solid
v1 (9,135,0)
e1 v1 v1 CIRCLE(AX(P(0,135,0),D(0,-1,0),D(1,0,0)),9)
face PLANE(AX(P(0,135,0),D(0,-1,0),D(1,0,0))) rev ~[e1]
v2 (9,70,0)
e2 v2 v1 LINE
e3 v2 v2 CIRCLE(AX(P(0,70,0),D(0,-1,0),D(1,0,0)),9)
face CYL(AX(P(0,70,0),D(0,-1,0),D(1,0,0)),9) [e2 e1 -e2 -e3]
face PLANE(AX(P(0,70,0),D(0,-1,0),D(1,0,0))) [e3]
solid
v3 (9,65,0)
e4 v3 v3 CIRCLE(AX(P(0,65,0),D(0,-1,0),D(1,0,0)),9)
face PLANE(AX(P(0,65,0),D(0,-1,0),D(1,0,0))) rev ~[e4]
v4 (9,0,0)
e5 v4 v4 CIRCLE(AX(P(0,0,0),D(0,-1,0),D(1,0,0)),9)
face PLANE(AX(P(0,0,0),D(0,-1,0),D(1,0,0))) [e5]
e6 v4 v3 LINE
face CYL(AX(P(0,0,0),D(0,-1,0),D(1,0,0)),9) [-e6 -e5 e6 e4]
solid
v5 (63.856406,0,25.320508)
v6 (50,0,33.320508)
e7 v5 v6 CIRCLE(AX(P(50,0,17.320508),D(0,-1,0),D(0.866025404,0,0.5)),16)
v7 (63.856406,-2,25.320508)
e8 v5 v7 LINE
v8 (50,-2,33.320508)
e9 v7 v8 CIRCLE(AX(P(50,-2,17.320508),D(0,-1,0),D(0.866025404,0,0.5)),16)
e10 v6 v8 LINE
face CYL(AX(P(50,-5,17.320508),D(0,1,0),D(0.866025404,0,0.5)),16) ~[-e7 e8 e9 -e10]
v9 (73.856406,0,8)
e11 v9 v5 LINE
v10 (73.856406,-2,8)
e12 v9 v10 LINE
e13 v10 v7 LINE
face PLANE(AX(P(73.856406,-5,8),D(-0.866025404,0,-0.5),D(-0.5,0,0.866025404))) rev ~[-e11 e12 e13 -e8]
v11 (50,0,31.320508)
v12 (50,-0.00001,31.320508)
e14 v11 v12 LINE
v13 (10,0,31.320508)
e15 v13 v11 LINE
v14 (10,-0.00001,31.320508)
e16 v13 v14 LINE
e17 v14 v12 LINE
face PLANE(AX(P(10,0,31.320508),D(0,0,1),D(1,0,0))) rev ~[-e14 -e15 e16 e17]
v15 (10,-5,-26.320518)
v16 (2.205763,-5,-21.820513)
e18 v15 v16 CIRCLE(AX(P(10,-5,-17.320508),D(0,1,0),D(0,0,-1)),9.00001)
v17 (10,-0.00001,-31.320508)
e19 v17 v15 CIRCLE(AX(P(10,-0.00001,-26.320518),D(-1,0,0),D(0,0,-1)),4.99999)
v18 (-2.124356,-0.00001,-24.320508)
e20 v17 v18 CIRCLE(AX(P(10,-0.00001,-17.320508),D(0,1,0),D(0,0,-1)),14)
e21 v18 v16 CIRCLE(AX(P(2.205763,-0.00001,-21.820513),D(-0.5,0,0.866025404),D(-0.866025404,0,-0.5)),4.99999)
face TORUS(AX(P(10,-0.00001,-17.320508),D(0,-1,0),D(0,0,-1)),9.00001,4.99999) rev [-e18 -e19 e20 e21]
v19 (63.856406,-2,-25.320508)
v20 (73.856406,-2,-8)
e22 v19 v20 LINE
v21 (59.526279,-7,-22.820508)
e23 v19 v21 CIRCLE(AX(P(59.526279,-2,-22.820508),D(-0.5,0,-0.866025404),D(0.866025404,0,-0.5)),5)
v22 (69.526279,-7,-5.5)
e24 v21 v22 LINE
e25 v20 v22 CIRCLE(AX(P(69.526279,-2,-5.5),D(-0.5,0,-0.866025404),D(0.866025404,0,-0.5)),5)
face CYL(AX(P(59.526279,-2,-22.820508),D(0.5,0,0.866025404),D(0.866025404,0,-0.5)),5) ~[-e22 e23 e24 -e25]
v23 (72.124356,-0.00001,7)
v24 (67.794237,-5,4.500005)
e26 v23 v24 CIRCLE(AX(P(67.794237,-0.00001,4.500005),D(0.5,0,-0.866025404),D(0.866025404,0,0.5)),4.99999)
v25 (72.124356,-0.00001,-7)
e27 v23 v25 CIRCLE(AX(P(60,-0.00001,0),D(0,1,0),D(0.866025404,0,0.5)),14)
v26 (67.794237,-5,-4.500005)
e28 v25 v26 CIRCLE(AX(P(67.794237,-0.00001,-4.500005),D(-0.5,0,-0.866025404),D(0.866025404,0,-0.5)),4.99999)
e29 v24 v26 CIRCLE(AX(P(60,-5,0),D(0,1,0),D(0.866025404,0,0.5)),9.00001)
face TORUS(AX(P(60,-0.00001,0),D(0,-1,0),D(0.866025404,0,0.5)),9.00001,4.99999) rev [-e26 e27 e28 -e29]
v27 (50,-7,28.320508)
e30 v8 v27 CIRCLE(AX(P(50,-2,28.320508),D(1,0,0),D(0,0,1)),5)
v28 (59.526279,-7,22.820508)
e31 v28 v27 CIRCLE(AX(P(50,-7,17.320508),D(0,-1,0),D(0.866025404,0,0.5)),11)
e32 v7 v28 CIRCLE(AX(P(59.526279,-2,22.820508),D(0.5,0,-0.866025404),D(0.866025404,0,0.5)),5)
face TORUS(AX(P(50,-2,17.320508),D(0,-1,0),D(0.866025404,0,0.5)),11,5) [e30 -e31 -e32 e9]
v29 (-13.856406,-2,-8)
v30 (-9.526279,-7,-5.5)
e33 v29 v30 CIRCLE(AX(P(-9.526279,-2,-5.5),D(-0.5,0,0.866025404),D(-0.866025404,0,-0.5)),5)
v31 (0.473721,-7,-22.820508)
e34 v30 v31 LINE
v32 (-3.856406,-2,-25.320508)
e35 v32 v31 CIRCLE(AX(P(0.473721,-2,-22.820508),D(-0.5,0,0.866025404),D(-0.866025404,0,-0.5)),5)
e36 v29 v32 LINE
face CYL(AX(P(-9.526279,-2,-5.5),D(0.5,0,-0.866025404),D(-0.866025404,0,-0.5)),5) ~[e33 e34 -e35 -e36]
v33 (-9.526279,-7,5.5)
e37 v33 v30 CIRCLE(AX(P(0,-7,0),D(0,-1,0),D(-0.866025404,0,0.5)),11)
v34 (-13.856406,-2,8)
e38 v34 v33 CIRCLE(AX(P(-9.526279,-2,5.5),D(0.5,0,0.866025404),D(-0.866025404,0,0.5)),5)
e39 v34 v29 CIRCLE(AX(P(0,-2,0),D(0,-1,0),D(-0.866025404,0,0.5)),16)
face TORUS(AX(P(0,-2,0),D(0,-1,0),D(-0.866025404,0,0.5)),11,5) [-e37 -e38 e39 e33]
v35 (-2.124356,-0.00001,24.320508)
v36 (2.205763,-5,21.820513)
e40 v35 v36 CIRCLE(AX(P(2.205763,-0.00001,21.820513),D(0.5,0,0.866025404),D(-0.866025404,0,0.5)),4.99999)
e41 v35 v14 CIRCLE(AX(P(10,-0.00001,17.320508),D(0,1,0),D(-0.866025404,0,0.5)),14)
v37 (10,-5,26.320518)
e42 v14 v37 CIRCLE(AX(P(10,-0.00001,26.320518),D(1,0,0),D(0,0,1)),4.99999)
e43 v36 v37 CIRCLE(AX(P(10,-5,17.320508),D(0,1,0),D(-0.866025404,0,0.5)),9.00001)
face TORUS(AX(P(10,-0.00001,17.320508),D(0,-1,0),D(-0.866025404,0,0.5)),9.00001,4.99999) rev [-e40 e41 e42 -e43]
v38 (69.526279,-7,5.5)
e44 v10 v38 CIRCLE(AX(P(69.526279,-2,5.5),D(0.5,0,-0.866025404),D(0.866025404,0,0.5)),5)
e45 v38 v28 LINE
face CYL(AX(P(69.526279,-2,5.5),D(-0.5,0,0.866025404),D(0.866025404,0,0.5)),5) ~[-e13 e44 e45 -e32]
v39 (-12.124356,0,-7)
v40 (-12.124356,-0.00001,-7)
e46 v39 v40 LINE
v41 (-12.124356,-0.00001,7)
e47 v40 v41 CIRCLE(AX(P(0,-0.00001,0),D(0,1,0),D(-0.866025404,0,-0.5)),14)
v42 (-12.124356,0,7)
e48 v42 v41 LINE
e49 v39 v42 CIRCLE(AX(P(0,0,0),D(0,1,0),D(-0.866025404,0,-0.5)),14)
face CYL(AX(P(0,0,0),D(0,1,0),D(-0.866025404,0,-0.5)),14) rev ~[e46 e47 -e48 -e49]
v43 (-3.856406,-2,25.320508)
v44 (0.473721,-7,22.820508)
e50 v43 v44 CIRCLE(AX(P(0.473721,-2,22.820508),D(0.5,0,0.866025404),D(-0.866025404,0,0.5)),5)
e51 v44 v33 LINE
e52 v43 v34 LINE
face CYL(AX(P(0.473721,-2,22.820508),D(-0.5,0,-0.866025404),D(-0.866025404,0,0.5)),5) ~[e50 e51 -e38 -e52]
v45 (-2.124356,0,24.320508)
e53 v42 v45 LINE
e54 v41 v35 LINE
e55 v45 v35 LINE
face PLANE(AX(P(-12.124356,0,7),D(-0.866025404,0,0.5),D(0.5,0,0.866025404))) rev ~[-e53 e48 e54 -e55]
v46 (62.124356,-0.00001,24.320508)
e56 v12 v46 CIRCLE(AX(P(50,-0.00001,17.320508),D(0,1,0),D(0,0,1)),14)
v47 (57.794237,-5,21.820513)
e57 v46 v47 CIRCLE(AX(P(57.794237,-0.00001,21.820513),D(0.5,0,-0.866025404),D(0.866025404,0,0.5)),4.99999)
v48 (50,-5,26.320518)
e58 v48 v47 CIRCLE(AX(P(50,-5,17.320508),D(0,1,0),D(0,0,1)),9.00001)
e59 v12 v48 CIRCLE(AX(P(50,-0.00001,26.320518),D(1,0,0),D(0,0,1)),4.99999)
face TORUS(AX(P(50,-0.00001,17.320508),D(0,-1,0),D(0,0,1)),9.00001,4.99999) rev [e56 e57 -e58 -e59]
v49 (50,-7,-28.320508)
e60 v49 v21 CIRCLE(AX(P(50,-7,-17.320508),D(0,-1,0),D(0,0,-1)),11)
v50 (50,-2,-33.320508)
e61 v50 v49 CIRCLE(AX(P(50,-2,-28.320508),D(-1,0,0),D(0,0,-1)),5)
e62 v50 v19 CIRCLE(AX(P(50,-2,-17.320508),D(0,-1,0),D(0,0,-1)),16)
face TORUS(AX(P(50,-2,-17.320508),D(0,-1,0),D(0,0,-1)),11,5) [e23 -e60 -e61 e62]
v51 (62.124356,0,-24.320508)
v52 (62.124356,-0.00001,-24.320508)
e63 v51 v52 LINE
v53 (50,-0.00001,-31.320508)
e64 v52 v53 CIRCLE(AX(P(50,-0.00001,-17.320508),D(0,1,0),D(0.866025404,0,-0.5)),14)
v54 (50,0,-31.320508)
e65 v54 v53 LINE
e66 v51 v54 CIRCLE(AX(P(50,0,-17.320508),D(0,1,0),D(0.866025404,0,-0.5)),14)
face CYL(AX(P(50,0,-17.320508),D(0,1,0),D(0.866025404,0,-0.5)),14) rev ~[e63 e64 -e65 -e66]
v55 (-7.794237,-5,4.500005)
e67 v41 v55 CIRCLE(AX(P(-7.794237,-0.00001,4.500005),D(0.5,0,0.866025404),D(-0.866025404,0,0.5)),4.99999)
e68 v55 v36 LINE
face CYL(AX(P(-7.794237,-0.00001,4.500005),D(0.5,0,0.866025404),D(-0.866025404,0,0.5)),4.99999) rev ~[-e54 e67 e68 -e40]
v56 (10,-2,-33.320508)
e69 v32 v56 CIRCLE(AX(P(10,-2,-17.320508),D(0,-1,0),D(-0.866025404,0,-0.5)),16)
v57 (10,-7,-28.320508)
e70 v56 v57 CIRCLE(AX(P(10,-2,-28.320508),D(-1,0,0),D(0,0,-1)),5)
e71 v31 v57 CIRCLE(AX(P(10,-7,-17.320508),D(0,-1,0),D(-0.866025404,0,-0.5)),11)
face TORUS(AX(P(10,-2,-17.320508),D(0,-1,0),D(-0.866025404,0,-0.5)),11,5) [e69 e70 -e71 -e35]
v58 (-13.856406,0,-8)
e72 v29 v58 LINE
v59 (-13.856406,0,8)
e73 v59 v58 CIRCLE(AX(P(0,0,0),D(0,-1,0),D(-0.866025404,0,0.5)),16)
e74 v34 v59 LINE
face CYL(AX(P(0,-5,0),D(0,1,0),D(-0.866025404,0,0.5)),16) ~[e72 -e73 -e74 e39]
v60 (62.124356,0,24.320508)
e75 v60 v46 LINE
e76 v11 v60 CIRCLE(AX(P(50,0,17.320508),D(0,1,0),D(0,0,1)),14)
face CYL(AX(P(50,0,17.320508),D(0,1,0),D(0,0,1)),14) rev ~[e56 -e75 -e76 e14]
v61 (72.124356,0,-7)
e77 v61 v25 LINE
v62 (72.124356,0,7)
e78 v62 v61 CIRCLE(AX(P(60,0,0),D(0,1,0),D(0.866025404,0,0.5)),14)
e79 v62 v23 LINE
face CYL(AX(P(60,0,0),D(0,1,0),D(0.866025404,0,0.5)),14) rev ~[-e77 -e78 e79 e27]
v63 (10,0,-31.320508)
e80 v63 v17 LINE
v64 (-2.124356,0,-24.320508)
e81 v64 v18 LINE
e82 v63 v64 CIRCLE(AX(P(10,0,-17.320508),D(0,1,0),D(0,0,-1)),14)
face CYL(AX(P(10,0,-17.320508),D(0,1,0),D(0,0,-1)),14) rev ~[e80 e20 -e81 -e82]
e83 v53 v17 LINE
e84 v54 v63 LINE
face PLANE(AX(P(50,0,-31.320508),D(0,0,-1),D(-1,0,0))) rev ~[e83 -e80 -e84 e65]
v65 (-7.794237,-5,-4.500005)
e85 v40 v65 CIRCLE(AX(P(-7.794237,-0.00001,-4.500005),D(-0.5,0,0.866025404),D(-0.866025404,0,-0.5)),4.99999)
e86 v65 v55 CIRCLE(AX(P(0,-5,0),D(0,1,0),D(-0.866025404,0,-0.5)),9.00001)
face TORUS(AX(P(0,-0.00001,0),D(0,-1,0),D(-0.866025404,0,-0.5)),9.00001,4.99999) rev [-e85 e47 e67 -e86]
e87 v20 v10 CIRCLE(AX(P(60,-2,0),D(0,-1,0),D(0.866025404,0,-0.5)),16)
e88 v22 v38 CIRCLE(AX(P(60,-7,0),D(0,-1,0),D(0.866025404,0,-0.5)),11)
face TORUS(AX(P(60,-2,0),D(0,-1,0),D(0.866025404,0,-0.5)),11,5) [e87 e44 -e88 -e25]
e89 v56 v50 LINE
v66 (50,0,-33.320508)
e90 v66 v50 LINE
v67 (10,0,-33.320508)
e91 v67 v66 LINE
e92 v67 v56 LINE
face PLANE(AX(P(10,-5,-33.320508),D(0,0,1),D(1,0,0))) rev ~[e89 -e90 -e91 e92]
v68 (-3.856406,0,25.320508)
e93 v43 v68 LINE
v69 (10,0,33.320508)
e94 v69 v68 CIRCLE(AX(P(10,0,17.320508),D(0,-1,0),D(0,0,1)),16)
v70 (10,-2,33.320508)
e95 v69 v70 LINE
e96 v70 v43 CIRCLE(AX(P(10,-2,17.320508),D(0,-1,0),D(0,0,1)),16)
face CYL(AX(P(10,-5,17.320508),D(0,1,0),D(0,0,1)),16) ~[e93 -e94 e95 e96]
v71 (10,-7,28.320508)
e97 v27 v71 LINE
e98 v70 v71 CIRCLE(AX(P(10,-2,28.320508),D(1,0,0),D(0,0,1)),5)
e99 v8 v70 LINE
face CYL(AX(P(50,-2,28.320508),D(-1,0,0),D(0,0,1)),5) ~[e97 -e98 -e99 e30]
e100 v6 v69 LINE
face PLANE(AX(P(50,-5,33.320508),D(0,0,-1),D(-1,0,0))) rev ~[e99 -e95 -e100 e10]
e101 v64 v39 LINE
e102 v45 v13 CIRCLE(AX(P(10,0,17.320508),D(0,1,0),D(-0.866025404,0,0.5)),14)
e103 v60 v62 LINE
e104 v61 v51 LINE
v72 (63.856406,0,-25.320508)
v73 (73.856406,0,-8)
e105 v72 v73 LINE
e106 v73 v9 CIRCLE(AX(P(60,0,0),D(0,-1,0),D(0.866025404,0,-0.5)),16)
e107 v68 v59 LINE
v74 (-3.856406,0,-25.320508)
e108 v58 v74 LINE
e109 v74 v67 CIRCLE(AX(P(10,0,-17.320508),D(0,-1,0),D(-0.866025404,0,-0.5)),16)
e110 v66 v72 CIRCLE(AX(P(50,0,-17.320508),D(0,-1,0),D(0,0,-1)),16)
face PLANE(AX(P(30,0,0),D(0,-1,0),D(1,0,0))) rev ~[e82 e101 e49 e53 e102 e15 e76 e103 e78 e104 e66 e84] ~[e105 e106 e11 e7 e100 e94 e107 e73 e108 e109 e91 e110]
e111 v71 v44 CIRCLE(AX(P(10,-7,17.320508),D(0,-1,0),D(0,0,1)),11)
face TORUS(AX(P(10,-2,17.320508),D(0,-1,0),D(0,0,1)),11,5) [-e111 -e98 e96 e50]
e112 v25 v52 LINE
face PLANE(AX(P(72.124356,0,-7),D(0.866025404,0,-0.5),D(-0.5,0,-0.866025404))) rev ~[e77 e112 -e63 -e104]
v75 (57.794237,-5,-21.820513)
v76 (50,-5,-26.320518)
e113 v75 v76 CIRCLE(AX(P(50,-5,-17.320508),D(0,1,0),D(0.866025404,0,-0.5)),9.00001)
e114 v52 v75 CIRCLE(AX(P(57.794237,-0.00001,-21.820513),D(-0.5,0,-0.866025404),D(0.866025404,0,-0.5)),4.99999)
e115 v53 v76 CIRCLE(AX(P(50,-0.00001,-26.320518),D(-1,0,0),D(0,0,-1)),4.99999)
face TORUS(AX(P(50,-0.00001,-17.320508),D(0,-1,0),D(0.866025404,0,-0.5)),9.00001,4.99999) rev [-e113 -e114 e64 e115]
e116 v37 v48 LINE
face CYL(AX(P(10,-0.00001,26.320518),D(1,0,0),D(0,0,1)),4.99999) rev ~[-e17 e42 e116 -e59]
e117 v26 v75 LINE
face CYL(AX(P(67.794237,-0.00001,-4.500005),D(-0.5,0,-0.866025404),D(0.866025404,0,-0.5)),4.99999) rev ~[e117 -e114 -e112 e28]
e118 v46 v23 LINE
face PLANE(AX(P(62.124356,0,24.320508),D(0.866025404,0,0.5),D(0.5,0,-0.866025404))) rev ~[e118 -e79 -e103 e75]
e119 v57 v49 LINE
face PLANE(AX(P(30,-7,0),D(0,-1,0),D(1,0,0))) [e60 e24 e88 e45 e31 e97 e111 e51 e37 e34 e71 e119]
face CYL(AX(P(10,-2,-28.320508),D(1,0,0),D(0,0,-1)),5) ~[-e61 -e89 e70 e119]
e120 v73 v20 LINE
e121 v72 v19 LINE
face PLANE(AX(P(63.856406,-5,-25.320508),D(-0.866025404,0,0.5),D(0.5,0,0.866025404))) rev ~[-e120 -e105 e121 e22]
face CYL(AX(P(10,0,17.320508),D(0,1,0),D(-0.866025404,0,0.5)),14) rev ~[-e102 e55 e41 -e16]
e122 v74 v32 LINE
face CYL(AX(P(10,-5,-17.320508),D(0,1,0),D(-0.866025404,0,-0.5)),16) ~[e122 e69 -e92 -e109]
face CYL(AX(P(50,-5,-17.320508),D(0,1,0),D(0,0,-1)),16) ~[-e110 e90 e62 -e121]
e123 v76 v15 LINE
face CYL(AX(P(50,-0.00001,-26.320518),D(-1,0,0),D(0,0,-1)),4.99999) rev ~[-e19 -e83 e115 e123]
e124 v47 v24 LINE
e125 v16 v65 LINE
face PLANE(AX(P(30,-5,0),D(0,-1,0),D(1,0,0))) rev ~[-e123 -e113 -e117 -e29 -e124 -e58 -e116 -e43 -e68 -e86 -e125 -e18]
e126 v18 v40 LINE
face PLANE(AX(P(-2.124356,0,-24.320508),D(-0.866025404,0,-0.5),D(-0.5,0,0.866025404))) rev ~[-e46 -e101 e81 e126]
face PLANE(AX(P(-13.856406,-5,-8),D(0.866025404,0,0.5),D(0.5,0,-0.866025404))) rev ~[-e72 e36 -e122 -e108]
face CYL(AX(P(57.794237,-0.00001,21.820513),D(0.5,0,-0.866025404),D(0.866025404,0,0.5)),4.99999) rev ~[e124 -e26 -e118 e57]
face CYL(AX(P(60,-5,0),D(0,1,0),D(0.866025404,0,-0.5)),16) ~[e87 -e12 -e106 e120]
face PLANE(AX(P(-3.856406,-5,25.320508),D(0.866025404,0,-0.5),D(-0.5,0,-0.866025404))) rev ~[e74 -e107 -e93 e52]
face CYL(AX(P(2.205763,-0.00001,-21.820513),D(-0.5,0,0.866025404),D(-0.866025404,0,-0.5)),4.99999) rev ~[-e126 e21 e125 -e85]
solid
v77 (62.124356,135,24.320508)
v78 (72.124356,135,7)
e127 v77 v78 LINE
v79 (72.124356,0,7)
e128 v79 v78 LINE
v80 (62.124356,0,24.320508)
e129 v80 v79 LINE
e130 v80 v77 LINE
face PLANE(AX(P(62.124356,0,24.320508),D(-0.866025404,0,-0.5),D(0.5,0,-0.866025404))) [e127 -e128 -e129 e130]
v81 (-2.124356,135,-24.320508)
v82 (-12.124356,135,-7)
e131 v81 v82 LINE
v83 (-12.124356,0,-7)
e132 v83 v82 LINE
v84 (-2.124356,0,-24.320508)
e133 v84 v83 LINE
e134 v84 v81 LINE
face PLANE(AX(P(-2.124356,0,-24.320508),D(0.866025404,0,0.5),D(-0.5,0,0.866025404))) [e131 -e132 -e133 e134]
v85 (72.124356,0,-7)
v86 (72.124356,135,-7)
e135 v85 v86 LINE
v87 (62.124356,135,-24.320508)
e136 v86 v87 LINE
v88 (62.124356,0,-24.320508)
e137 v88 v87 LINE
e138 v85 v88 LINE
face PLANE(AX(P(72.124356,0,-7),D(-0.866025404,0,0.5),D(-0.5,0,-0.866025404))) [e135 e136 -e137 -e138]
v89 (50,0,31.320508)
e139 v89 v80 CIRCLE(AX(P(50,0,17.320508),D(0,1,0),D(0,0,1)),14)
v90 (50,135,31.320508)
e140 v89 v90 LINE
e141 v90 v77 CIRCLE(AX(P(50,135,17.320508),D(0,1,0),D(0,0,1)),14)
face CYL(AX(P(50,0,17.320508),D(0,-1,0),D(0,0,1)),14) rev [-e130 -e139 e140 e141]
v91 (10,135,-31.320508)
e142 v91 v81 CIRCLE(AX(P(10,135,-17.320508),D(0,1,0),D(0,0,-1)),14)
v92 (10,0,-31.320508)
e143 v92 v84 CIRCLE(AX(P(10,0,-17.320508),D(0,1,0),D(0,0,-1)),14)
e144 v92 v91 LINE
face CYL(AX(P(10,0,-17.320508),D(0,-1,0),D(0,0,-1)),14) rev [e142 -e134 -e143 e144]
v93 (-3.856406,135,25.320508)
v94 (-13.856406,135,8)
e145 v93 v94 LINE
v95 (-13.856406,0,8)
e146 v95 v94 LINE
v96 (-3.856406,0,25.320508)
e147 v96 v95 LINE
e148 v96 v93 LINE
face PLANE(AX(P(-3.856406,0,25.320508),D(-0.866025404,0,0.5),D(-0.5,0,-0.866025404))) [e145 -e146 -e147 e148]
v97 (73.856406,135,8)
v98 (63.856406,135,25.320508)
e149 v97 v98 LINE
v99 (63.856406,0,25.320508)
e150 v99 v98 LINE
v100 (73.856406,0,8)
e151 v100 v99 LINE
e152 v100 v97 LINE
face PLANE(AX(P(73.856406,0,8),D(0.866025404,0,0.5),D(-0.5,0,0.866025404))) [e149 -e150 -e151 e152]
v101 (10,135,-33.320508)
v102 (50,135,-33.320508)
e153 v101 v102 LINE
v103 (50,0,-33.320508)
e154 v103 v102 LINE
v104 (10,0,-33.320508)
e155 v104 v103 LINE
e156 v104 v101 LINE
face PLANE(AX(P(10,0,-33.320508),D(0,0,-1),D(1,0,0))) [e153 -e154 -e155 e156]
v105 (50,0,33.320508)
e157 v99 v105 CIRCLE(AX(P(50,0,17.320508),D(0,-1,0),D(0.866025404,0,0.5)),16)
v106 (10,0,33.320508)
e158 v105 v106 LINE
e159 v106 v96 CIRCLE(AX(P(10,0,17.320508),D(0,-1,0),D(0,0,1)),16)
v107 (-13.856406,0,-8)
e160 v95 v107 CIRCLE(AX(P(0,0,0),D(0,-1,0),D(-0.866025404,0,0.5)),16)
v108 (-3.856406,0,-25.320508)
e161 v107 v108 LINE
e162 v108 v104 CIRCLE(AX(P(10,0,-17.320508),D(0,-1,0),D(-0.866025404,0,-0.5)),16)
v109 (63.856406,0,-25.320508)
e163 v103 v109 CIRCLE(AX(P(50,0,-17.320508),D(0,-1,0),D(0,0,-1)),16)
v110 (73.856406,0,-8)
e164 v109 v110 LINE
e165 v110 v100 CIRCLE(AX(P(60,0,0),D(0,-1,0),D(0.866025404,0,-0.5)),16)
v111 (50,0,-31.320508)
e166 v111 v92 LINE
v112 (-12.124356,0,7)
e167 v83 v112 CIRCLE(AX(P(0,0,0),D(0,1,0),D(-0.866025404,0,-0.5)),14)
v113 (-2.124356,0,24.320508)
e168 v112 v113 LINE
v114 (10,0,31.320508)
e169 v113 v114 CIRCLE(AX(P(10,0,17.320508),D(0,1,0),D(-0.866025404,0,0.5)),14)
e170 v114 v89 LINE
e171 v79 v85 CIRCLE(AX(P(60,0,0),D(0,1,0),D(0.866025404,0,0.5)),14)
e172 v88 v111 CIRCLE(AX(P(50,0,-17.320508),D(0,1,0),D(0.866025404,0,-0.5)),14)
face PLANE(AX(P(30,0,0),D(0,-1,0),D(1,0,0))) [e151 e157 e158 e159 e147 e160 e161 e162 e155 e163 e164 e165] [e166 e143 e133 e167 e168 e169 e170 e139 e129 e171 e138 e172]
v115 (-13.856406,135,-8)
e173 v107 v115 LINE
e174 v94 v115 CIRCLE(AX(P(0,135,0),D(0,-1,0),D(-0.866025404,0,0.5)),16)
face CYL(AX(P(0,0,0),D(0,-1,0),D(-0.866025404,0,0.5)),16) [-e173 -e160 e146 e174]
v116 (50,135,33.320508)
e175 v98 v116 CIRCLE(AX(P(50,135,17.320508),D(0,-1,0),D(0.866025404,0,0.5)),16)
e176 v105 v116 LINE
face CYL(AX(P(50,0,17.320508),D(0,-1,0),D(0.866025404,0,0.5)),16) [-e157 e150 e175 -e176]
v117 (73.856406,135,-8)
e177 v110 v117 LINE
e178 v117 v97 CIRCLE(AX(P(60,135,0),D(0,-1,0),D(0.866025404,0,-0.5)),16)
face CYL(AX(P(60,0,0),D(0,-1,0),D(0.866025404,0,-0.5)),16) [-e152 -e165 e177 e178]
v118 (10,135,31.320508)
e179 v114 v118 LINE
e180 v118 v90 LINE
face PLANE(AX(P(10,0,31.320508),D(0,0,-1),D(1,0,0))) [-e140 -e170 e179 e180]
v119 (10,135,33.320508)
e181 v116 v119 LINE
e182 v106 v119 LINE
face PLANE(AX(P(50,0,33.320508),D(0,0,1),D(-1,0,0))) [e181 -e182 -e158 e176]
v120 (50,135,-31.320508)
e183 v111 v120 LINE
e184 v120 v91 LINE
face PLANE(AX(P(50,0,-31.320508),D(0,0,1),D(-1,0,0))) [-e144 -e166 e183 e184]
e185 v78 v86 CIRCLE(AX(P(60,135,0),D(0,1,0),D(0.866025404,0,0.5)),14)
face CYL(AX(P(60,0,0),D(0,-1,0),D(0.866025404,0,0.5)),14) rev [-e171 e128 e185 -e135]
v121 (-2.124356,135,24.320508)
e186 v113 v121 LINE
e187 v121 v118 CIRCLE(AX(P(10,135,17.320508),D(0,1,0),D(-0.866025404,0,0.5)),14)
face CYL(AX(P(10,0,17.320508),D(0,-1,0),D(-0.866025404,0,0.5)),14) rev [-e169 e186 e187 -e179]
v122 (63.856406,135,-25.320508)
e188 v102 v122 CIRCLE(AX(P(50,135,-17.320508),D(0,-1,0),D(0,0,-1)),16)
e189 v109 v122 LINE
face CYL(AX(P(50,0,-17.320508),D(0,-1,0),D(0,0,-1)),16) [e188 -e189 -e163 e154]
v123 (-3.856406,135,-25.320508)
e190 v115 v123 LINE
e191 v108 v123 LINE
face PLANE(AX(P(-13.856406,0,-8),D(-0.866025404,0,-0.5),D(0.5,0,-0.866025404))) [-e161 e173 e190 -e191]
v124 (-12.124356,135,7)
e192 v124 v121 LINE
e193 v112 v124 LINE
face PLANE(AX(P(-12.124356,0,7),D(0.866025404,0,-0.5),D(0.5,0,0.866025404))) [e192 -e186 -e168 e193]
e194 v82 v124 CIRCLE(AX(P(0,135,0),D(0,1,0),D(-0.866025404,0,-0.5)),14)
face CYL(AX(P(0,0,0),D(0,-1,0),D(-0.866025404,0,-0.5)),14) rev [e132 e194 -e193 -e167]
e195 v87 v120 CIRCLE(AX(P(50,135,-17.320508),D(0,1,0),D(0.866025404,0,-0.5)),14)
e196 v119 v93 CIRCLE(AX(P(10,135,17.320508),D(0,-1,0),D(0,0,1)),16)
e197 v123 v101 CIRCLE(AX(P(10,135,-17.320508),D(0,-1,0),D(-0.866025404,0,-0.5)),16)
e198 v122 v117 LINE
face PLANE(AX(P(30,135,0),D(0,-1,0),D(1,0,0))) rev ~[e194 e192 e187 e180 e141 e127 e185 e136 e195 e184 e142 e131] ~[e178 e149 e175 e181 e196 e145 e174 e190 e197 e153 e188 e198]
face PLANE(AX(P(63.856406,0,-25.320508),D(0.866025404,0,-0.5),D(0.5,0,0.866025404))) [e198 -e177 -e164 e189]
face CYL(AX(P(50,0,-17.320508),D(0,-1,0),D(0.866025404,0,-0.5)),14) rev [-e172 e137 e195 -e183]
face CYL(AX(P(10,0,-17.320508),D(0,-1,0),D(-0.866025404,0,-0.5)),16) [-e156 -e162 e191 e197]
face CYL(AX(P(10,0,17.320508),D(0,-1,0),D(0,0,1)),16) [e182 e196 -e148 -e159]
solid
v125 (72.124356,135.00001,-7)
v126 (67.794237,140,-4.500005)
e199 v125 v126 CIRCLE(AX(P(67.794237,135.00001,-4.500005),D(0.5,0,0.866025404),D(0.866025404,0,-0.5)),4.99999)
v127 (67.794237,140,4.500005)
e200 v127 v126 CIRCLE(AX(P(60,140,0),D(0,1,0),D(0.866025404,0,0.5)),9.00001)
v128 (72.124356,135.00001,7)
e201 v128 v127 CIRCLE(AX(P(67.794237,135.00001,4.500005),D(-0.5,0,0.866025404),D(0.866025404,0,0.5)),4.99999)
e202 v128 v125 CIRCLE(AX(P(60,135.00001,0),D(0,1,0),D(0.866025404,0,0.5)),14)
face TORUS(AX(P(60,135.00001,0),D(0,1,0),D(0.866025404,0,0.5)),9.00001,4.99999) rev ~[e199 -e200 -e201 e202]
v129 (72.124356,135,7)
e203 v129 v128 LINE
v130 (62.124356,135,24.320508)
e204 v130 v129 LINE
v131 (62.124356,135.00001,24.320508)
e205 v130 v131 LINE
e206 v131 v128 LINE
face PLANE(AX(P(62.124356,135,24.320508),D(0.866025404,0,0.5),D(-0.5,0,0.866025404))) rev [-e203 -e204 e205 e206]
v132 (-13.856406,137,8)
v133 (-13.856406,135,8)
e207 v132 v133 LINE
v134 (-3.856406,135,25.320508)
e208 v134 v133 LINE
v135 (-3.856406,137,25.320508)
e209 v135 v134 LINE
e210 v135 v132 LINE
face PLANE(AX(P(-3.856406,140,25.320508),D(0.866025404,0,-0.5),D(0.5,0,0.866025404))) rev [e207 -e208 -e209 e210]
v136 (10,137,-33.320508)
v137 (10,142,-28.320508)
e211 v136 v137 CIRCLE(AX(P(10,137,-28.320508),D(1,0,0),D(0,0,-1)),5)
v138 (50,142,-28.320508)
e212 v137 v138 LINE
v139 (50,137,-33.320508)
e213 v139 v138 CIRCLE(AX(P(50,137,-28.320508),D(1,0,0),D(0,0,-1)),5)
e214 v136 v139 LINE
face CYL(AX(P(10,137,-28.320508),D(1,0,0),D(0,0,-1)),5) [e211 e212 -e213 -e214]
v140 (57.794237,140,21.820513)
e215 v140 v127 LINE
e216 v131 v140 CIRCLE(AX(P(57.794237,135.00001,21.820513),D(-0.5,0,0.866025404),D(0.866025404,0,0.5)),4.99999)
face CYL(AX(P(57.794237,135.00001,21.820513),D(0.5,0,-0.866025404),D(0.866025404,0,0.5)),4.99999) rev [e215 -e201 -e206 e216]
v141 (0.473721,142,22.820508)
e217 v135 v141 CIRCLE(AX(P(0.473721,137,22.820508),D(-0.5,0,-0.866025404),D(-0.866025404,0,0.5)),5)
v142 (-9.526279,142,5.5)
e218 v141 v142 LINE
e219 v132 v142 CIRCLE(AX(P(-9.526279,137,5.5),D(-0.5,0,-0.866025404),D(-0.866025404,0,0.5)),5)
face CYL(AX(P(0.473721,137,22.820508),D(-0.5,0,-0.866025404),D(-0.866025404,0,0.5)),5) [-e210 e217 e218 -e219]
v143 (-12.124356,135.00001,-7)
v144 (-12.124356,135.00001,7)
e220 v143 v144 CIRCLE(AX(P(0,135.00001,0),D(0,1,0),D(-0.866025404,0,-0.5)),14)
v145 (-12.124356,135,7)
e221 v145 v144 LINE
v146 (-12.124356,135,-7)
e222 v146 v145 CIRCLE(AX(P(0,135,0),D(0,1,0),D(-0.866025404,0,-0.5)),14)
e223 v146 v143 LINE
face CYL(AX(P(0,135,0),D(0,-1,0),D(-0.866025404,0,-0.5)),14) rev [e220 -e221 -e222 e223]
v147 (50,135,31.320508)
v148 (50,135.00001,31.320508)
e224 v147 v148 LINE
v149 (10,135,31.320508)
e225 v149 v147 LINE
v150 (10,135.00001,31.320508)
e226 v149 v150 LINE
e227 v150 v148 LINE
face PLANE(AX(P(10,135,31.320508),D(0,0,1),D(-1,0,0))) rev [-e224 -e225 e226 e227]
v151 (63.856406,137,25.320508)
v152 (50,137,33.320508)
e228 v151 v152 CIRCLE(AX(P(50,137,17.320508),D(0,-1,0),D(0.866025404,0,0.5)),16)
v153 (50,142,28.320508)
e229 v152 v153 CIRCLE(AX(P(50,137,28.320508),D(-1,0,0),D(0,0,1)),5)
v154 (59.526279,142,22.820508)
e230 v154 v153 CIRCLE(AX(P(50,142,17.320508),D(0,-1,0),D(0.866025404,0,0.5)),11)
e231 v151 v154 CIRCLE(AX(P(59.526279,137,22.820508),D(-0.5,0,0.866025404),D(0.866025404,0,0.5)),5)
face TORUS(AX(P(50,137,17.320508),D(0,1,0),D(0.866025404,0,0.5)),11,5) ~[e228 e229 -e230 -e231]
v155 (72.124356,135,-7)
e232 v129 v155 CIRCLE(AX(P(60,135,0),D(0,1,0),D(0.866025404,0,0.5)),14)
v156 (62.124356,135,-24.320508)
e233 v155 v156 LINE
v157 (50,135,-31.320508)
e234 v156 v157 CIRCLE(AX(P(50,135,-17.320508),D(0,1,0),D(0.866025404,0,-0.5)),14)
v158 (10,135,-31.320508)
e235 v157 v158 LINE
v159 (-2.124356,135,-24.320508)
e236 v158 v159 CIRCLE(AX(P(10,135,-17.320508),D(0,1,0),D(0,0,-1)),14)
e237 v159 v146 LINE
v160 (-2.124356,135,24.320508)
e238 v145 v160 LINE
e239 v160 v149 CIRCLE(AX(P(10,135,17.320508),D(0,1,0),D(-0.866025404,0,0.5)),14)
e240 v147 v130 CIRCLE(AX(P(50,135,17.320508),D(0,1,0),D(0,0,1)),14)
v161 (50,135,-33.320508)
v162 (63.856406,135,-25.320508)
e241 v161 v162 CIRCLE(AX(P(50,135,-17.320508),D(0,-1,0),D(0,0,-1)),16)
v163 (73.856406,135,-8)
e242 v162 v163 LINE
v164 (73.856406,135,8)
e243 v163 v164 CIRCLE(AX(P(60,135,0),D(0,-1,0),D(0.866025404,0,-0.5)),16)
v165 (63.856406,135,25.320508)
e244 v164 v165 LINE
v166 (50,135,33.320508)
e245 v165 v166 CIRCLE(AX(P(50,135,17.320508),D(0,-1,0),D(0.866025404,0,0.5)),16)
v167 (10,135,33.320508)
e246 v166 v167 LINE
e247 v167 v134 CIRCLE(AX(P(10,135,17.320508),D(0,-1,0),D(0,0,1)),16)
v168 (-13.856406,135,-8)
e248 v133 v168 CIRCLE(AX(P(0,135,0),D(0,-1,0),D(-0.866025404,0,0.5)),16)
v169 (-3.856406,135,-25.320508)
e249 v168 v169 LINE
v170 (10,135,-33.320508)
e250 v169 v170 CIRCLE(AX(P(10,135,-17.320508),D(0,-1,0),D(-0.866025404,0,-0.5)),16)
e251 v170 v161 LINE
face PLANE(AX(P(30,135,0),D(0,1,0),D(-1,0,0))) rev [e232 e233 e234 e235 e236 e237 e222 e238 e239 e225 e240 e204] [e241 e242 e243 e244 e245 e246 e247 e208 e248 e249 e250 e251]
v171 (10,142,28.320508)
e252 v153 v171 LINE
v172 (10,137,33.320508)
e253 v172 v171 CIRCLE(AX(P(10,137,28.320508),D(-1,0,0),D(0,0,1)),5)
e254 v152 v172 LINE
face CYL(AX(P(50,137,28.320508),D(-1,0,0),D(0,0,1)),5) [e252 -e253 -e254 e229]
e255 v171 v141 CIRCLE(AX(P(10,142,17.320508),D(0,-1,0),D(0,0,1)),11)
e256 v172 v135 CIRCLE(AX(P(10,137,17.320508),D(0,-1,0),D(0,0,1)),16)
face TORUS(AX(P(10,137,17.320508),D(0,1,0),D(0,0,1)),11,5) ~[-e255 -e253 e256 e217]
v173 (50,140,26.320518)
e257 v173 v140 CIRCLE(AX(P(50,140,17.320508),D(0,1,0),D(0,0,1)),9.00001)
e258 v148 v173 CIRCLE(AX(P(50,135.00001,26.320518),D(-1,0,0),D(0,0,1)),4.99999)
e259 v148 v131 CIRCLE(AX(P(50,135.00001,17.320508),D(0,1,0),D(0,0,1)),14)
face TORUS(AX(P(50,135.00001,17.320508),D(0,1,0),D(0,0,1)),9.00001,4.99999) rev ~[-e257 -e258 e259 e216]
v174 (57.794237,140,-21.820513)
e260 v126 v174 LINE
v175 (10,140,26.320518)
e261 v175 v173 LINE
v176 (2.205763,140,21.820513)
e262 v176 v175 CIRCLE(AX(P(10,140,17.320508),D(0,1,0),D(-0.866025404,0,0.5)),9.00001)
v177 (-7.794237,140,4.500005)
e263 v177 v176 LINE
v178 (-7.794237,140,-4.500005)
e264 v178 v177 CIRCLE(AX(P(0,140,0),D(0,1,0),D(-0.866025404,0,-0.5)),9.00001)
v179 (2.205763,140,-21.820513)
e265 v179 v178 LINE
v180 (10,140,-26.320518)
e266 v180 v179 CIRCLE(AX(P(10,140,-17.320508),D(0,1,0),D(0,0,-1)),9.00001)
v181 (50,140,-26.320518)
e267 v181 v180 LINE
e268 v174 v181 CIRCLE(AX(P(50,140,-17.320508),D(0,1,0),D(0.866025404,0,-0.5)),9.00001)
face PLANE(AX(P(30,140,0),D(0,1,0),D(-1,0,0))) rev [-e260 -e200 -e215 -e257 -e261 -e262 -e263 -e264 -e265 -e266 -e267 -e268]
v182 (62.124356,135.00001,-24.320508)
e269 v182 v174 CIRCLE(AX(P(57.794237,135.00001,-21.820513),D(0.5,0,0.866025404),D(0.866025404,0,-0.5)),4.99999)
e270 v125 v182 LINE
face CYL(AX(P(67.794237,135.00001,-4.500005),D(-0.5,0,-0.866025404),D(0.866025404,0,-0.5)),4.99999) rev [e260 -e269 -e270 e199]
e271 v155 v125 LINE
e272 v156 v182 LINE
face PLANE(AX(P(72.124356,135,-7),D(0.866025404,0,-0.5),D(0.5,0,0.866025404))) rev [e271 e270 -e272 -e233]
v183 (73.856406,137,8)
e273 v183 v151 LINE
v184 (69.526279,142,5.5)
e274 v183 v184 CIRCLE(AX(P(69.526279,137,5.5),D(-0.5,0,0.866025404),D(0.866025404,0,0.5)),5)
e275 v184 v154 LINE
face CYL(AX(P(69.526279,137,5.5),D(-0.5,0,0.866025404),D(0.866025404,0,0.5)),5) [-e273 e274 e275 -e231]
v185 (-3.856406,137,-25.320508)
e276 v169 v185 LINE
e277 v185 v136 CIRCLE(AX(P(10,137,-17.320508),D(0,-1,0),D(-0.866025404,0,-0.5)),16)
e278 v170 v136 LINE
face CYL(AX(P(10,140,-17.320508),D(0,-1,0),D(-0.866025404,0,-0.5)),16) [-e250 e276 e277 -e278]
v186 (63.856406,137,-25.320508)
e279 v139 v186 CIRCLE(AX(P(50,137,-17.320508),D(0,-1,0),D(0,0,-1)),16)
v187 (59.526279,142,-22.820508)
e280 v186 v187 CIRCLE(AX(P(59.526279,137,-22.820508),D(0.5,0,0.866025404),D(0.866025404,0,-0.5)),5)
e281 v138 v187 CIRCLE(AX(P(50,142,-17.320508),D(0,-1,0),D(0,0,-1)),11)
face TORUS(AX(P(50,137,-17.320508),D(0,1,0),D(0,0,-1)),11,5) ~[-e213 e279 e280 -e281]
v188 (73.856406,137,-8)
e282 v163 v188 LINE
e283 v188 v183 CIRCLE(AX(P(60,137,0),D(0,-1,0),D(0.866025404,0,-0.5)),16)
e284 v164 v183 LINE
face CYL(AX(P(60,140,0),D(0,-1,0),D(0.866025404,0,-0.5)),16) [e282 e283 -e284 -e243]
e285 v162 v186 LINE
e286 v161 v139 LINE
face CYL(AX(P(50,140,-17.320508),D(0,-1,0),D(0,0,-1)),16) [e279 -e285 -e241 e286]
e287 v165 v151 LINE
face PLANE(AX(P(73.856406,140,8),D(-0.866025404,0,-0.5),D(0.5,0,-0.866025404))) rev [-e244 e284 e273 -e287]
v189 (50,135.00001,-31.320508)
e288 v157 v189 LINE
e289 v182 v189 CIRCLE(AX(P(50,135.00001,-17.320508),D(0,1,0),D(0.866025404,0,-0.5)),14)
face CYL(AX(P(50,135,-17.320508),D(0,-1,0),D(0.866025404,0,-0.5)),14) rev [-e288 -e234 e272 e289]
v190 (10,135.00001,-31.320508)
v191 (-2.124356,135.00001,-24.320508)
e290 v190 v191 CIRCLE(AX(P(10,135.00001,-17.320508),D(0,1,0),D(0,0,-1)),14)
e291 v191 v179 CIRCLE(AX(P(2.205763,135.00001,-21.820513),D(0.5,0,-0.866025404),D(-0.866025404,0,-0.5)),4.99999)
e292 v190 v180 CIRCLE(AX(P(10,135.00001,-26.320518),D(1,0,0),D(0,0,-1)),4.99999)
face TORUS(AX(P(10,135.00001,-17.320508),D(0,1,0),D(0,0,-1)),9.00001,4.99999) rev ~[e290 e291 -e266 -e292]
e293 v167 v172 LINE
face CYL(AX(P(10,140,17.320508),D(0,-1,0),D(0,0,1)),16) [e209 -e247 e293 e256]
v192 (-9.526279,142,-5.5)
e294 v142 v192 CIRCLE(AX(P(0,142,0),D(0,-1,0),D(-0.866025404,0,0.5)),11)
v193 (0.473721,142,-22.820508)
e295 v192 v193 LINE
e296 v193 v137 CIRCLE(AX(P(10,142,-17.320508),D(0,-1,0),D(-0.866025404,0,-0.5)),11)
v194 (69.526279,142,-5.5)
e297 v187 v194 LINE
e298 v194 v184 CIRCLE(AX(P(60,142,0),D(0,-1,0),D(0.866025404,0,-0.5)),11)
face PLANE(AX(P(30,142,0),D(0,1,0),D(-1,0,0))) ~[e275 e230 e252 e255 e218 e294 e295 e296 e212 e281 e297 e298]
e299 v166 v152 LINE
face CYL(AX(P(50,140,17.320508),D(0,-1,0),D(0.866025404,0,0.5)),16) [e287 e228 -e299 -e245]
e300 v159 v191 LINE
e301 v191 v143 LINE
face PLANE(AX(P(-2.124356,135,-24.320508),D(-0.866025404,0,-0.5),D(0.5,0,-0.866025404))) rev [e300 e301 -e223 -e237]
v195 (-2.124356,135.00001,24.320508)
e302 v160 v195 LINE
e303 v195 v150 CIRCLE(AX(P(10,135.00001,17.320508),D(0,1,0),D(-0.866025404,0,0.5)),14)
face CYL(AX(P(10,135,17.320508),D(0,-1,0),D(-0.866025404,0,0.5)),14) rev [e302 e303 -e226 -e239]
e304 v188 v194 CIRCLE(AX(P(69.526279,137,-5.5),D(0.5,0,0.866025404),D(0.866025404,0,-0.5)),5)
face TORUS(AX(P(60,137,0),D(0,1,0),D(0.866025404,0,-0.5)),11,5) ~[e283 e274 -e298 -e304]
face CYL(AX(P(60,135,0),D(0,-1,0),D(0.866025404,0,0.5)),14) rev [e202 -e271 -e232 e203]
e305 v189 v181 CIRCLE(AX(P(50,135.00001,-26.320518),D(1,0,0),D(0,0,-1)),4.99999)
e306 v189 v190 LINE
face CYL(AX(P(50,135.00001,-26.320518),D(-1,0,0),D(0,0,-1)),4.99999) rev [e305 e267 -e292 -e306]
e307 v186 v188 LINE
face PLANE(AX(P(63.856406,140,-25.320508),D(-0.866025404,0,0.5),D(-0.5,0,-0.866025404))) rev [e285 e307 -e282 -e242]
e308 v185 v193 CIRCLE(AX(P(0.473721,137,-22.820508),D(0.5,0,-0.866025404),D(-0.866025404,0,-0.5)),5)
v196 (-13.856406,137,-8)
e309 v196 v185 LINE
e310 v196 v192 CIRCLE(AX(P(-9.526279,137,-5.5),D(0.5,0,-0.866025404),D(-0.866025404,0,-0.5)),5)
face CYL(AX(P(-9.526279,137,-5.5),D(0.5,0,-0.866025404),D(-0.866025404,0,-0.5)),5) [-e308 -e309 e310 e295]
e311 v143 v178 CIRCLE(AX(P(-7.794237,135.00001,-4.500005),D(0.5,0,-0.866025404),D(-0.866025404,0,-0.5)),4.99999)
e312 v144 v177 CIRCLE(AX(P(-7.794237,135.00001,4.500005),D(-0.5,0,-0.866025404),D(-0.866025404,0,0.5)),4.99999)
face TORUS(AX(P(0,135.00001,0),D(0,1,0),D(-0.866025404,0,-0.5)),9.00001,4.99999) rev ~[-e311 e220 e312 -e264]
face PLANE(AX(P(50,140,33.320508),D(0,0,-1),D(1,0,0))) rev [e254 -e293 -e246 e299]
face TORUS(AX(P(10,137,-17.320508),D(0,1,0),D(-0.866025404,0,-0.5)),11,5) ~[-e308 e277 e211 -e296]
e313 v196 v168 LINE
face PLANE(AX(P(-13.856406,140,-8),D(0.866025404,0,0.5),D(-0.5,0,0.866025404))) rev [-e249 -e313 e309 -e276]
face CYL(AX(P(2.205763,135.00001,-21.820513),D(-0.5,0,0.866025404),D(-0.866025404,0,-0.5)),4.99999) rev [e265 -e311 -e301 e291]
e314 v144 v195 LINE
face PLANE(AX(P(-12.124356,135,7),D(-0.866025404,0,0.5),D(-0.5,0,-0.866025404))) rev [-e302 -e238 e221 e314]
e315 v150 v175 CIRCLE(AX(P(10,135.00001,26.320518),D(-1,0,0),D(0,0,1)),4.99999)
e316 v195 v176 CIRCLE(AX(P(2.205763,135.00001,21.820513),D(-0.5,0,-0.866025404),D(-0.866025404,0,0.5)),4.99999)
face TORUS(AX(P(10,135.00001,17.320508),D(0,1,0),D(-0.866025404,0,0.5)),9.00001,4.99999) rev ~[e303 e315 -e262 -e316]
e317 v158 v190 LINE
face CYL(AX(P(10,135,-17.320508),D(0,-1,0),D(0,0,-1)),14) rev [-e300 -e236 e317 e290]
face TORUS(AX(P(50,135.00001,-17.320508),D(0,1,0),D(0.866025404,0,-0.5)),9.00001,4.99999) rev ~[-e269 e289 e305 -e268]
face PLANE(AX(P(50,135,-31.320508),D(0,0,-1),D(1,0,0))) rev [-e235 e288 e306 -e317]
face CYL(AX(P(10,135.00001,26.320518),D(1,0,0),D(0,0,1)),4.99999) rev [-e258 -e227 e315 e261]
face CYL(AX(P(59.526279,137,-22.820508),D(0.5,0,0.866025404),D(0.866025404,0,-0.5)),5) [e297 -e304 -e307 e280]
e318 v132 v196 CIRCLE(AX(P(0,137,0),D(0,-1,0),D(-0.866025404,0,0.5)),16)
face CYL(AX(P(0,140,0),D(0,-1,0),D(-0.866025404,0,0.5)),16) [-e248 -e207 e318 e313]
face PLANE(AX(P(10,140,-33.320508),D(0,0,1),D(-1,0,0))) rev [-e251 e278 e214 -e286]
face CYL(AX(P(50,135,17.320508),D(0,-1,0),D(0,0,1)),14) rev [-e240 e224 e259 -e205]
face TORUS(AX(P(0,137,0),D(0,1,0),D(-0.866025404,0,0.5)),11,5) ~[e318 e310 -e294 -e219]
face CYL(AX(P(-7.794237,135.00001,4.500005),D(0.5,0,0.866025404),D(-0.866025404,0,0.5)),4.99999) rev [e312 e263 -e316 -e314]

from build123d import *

# Parameters (mm, degrees)
F0_R      = 9
F4_DEPTH  = 65
F3_R      = 9
F5_DEPTH  = 65
F6_DEPTH  = 135
F8_DEPTH  = 5
F10_DEPTH = 2
F11_R     = 5
F12_R     = 4.99999


# Not quite as in the source:
# - a fillet or chamfer is up to 0.001 mm smaller than in the source, because OpenCascade refuses the exact size


with BuildPart() as f4:
    # F0 (on Front) → F4 (new body)
    with BuildSketch(Plane.XZ):
        Circle(F0_R)
    extrude(amount=-F4_DEPTH)


with BuildPart() as f5:
    # F3 (on offset) → F5 (new body)
    with BuildSketch(Plane.XZ.offset(-70)):
        Circle(F3_R)
    extrude(amount=-F5_DEPTH)


with BuildPart() as f6:
    # F1 (on Front) → F6 (new body)
    with BuildSketch(Plane.XZ):
        with BuildLine():
            Line((50, 33.3205080757), (10, 33.3205080757))
            ThreePointArc((10, 33.3205080757), (2, 31.1769145362), (-3.8564064606, 25.3205080757))
            Line((-3.8564064606, 25.3205080757), (-13.8564064606, 8))
            ThreePointArc((-13.8564064606, 8), (-16, 0), (-13.8564064606, -8))
            Line((-13.8564064606, -8), (-3.8564064606, -25.3205080757))
            ThreePointArc((-3.8564064606, -25.3205080757), (2, -31.1769145362), (10, -33.3205080757))
            Line((10, -33.3205080757), (50, -33.3205080757))
            ThreePointArc((50, -33.3205080757), (58, -31.1769145362), (63.8564064606, -25.3205080757))
            Line((63.8564064606, -25.3205080757), (73.8564064606, -8))
            ThreePointArc((73.8564064606, -8), (76, 0), (73.8564064606, 8))
            Line((73.8564064606, 8), (63.8564064606, 25.3205080757))
            ThreePointArc((63.8564064606, 25.3205080757), (58, 31.1769145362), (50, 33.3205080757))
        make_face()
        with BuildLine():
            ThreePointArc((-2.124355653, 24.3205080757), (3, 29.4448637287), (10, 31.3205080757))
            Line((10, 31.3205080757), (50, 31.3205080757))
            ThreePointArc((50, 31.3205080757), (57, 29.4448637287), (62.124355653, 24.3205080757))
            Line((62.124355653, 24.3205080757), (72.124355653, 7))
            ThreePointArc((72.124355653, 7), (74, 0), (72.124355653, -7))
            Line((72.124355653, -7), (62.124355653, -24.3205080757))
            ThreePointArc((62.124355653, -24.3205080757), (57, -29.4448637287), (50, -31.3205080757))
            Line((50, -31.3205080757), (10, -31.3205080757))
            ThreePointArc((10, -31.3205080757), (3, -29.4448637287), (-2.124355653, -24.3205080757))
            Line((-2.124355653, -24.3205080757), (-12.124355653, -7))
            ThreePointArc((-12.124355653, -7), (-14, 0), (-12.124355653, 7))
            Line((-12.124355653, 7), (-2.124355653, 24.3205080757))
        make_face(mode=Mode.SUBTRACT)
    extrude(amount=-F6_DEPTH)


with BuildPart() as f8:
    # F7 (on face) → F8 (new body)
    with BuildSketch(Plane.XZ):
        with BuildLine():
            ThreePointArc((-3.8564064606, -25.3205080757), (2, -31.1769145362), (10, -33.3205080757))
            Line((10, -33.3205080757), (50, -33.3205080757))
            ThreePointArc((50, -33.3205080757), (58, -31.1769145362), (63.8564064606, -25.3205080757))
            Line((63.8564064606, -25.3205080757), (73.8564064606, -8))
            ThreePointArc((73.8564064606, -8), (76, 0), (73.8564064606, 8))
            Line((73.8564064606, 8), (63.8564064606, 25.3205080757))
            ThreePointArc((63.8564064606, 25.3205080757), (58, 31.1769145362), (50, 33.3205080757))
            Line((50, 33.3205080757), (10, 33.3205080757))
            ThreePointArc((10, 33.3205080757), (2, 31.1769145362), (-3.8564064606, 25.3205080757))
            Line((-3.8564064606, 25.3205080757), (-13.8564064606, 8))
            ThreePointArc((-13.8564064606, 8), (-16, 0), (-13.8564064606, -8))
            Line((-13.8564064606, -8), (-3.8564064606, -25.3205080757))
        make_face()
        with BuildLine():
            ThreePointArc((-2.124355653, 24.3205080757), (3, 29.4448637287), (10, 31.3205080757))
            Line((10, 31.3205080757), (50, 31.3205080757))
            ThreePointArc((50, 31.3205080757), (57, 29.4448637287), (62.124355653, 24.3205080757))
            Line((62.124355653, 24.3205080757), (72.124355653, 7))
            ThreePointArc((72.124355653, 7), (74, 0), (72.124355653, -7))
            Line((72.124355653, -7), (62.124355653, -24.3205080757))
            ThreePointArc((62.124355653, -24.3205080757), (57, -29.4448637287), (50, -31.3205080757))
            Line((50, -31.3205080757), (10, -31.3205080757))
            ThreePointArc((10, -31.3205080757), (3, -29.4448637287), (-2.124355653, -24.3205080757))
            Line((-2.124355653, -24.3205080757), (-12.124355653, -7))
            ThreePointArc((-12.124355653, -7), (-14, 0), (-12.124355653, 7))
            Line((-12.124355653, 7), (-2.124355653, 24.3205080757))
        make_face(mode=Mode.SUBTRACT)
    extrude(amount=F8_DEPTH)

    # F9 (on face) → F10 (join)
    with BuildSketch(Plane.XZ.offset(5)):
        with BuildLine():
            Line((-13.8564064606, -8), (-3.8564064606, -25.3205080757))
            ThreePointArc((-3.8564064606, -25.3205080757), (2, -31.1769145362), (10, -33.3205080757))
            Line((10, -33.3205080757), (50, -33.3205080757))
            ThreePointArc((50, -33.3205080757), (58, -31.1769145362), (63.8564064606, -25.3205080757))
            Line((63.8564064606, -25.3205080757), (73.8564064606, -8))
            ThreePointArc((73.8564064606, -8), (76, 0), (73.8564064606, 8))
            Line((73.8564064606, 8), (63.8564064606, 25.3205080757))
            ThreePointArc((63.8564064606, 25.3205080757), (58, 31.1769145362), (50, 33.3205080757))
            Line((50, 33.3205080757), (10, 33.3205080757))
            ThreePointArc((10, 33.3205080757), (2, 31.1769145362), (-3.8564064606, 25.3205080757))
            Line((-3.8564064606, 25.3205080757), (-13.8564064606, 8))
            ThreePointArc((-13.8564064606, 8), (-16, 0), (-13.8564064606, -8))
        make_face()
        with BuildLine():
            Line((-12.124355653, 7), (-2.124355653, 24.3205080757))
            ThreePointArc((-2.124355653, 24.3205080757), (3, 29.4448637287), (10, 31.3205080757))
            Line((10, 31.3205080757), (50, 31.3205080757))
            ThreePointArc((50, 31.3205080757), (57, 29.4448637287), (62.124355653, 24.3205080757))
            Line((62.124355653, 24.3205080757), (72.124355653, 7))
            ThreePointArc((72.124355653, 7), (74, 0), (72.124355653, -7))
            Line((72.124355653, -7), (62.124355653, -24.3205080757))
            ThreePointArc((62.124355653, -24.3205080757), (57, -29.4448637287), (50, -31.3205080757))
            Line((50, -31.3205080757), (10, -31.3205080757))
            ThreePointArc((10, -31.3205080757), (3, -29.4448637287), (-2.124355653, -24.3205080757))
            Line((-2.124355653, -24.3205080757), (-12.124355653, -7))
            ThreePointArc((-12.124355653, -7), (-14, 0), (-12.124355653, 7))
        make_face(mode=Mode.SUBTRACT)
        with BuildLine():
            ThreePointArc((10, 31.3205080757), (3, 29.4448637287), (-2.124355653, 24.3205080757))
            Line((-2.124355653, 24.3205080757), (-12.124355653, 7))
            ThreePointArc((-12.124355653, 7), (-14, 0), (-12.124355653, -7))
            Line((-12.124355653, -7), (-2.124355653, -24.3205080757))
            ThreePointArc((-2.124355653, -24.3205080757), (3, -29.4448637287), (10, -31.3205080757))
            Line((10, -31.3205080757), (50, -31.3205080757))
            ThreePointArc((50, -31.3205080757), (57, -29.4448637287), (62.124355653, -24.3205080757))
            Line((62.124355653, -24.3205080757), (72.124355653, -7))
            ThreePointArc((72.124355653, -7), (74, 0), (72.124355653, 7))
            Line((72.124355653, 7), (62.124355653, 24.3205080757))
            ThreePointArc((62.124355653, 24.3205080757), (57, 29.4448637287), (50, 31.3205080757))
            Line((50, 31.3205080757), (10, 31.3205080757))
        make_face()
    extrude(amount=F10_DEPTH)

    # F11
    f11_edges = [f8.edges().sort_by_distance(p)[0] for p in [
        (2, -7, 31.176915),
        (-8.856406, -7, 16.660254),
        (-16, -7, 0),
        (-8.856406, -7, -16.660254),
        (2, -7, -31.176915),
        (30, -7, -33.320508),
        (58, -7, -31.176915),
        (68.856406, -7, -16.660254),
        (76, -7, 0),
        (68.856406, -7, 16.660254),
        (58, -7, 31.176915),
        (30, -7, 33.320508),
    ]]
    fillet(f11_edges, radius=F11_R)

    # F12 (radius 5 in the source; OpenCascade refuses exactly that, so slightly less here)
    f12_edges = [f8.edges().sort_by_distance(p)[0] for p in [
        (3, -5, 29.444864),
        (30, -5, 31.320508),
        (57, -5, 29.444864),
        (67.124356, -5, 15.660254),
        (74, -5, 0),
        (67.124356, -5, -15.660254),
        (57, -5, -29.444864),
        (30, -5, -31.320508),
        (3, -5, -29.444864),
        (-7.124356, -5, -15.660254),
        (-14, -5, 0),
        (-7.124356, -5, 15.660254),
    ]]
    fillet(f12_edges, radius=F12_R)


with BuildPart() as f14_1:
    # F14: instance of F8
    add(f8.part.mirror(Plane.XZ.offset(-67.5)))


solid = Compound([f4.part, f5.part, f6.part, f8.part, f14_1.part])
